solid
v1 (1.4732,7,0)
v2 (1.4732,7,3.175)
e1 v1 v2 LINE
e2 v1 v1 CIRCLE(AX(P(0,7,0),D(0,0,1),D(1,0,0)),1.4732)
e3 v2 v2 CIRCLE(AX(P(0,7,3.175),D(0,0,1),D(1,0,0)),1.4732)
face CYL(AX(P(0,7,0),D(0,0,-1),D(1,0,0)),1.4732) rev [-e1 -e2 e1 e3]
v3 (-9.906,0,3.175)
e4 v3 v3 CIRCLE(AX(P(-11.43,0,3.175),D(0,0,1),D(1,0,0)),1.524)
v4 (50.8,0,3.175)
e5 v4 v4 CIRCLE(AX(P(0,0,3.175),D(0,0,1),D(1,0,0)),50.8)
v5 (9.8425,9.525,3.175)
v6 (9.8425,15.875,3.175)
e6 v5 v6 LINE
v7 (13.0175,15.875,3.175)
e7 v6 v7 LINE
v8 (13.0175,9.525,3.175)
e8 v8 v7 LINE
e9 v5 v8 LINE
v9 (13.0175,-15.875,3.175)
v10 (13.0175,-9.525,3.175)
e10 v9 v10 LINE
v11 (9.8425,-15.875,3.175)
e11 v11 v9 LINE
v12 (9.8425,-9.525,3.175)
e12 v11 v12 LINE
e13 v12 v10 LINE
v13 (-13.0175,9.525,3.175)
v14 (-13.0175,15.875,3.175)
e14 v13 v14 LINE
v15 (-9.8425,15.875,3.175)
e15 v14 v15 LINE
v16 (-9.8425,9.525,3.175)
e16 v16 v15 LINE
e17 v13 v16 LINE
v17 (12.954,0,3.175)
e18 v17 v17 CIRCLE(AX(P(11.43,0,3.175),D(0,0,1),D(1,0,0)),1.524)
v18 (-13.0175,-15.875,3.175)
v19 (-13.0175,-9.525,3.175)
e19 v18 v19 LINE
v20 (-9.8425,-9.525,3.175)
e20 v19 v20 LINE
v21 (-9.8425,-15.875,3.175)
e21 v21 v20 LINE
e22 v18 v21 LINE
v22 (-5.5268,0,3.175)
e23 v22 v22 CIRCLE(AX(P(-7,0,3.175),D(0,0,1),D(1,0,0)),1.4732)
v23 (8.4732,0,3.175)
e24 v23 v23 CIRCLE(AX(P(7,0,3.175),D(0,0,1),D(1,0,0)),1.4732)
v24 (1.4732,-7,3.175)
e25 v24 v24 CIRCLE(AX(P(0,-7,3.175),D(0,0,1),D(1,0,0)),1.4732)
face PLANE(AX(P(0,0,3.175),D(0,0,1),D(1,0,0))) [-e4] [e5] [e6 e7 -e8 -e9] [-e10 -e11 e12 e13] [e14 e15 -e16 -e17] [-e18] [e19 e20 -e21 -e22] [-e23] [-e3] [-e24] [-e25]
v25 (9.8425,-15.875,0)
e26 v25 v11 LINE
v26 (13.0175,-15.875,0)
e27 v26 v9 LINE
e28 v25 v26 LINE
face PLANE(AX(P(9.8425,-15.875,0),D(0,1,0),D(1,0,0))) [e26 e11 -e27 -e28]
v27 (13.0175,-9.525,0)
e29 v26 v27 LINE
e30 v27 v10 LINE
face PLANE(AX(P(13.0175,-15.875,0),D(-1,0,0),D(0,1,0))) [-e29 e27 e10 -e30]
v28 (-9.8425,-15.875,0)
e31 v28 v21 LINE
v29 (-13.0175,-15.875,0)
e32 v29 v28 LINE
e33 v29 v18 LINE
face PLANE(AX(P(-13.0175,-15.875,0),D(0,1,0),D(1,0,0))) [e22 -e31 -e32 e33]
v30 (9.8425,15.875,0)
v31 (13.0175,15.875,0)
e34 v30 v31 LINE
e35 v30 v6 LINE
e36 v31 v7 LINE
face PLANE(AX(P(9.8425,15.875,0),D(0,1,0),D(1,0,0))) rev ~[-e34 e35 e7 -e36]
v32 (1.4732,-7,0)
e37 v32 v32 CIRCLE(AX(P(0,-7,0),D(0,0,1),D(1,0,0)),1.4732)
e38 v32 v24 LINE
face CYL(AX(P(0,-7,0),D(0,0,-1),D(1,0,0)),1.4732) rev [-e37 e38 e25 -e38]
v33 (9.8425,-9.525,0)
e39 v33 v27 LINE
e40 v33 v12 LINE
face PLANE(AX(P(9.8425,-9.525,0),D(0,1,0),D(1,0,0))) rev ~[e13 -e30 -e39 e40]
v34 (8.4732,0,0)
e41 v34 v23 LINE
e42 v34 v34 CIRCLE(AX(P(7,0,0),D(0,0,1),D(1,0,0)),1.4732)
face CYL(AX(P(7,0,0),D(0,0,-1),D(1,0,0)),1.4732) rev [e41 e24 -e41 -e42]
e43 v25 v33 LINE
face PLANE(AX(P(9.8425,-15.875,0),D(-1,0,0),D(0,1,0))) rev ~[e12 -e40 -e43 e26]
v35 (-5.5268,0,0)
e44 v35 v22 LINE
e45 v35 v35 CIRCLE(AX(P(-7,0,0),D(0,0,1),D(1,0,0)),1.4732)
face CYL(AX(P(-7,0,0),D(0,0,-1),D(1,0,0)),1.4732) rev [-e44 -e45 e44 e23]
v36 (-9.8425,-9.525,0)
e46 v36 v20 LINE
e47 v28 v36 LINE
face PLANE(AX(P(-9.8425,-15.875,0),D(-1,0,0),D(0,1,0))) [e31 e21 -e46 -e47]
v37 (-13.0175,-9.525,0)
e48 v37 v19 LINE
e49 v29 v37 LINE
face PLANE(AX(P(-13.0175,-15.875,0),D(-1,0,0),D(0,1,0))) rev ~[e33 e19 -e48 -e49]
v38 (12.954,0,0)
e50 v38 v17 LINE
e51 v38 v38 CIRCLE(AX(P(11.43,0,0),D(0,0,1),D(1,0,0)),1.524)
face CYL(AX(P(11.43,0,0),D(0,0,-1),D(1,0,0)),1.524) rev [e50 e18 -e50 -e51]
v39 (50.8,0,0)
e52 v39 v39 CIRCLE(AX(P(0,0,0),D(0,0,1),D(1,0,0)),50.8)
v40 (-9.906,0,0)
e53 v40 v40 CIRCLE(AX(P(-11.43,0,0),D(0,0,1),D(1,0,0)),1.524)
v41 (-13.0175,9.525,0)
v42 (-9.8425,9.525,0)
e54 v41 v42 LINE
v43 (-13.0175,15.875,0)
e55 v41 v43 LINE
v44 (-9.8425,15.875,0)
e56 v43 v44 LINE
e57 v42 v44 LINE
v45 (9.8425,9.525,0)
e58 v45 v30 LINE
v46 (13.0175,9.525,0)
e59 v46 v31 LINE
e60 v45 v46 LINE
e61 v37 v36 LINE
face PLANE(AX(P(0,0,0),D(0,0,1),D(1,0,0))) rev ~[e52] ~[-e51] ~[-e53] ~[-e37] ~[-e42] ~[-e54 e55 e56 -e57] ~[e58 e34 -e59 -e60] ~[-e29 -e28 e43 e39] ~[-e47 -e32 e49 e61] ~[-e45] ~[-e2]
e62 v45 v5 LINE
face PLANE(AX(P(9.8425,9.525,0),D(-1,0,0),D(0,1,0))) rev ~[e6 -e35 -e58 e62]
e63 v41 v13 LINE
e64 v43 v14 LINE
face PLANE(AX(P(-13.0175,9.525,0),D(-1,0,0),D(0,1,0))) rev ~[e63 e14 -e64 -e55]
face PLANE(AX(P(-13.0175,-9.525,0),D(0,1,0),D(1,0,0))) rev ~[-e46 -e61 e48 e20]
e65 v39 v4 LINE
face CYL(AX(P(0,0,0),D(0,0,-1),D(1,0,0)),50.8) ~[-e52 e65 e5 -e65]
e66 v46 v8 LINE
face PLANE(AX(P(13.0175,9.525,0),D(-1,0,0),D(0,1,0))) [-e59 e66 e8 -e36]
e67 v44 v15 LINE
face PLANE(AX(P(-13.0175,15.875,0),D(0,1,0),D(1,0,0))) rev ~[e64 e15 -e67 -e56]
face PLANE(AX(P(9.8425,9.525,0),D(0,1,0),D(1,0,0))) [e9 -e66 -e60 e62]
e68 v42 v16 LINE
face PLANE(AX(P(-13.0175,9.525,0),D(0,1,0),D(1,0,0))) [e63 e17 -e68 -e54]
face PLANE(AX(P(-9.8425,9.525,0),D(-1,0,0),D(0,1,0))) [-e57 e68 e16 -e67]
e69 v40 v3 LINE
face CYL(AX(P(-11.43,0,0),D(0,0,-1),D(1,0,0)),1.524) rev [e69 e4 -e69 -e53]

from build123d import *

# Parameters (mm, degrees)
F0_R     = 50.8
F0_W     = 3.175
F0_H     = 6.35
F0_R_2   = 1.4732
F0_R_3   = 1.524
F1_DEPTH = 3.175


# Not quite as in the source:
# - a length typed as a fraction of an inch, garbled in the dataset ("3 / 203.2 mm" for 3/8 in), is restored


with BuildPart() as f1:
    # F0 (on Top) → F1 (new body)
    with BuildSketch(Plane.XY):
        Circle(F0_R)
        with Locations((-11.43, -12.7)):
            Rectangle(F0_W, F0_H, mode=Mode.SUBTRACT)
        with Locations((0, -7)):
            Circle(F0_R_2, mode=Mode.SUBTRACT)
        with Locations((-11.43, 0)):
            Circle(F0_R_3, mode=Mode.SUBTRACT)
        with Locations((-7, 0)):
            Circle(F0_R_2, mode=Mode.SUBTRACT)
        with Locations((11.43, -12.7)):
            Rectangle(F0_W, F0_H, mode=Mode.SUBTRACT)
        with Locations((7, 0)):
            Circle(F0_R_2, mode=Mode.SUBTRACT)
        with Locations((11.43, 0)):
            Circle(F0_R_3, mode=Mode.SUBTRACT)
        with Locations((0, 7)):
            Circle(F0_R_2, mode=Mode.SUBTRACT)
        with Locations((-11.43, 12.7)):
            Rectangle(F0_W, F0_H, mode=Mode.SUBTRACT)
        with Locations((11.43, 12.7)):
            Rectangle(F0_W, F0_H, mode=Mode.SUBTRACT)
    extrude(amount=F1_DEPTH)


solid = f1.part
